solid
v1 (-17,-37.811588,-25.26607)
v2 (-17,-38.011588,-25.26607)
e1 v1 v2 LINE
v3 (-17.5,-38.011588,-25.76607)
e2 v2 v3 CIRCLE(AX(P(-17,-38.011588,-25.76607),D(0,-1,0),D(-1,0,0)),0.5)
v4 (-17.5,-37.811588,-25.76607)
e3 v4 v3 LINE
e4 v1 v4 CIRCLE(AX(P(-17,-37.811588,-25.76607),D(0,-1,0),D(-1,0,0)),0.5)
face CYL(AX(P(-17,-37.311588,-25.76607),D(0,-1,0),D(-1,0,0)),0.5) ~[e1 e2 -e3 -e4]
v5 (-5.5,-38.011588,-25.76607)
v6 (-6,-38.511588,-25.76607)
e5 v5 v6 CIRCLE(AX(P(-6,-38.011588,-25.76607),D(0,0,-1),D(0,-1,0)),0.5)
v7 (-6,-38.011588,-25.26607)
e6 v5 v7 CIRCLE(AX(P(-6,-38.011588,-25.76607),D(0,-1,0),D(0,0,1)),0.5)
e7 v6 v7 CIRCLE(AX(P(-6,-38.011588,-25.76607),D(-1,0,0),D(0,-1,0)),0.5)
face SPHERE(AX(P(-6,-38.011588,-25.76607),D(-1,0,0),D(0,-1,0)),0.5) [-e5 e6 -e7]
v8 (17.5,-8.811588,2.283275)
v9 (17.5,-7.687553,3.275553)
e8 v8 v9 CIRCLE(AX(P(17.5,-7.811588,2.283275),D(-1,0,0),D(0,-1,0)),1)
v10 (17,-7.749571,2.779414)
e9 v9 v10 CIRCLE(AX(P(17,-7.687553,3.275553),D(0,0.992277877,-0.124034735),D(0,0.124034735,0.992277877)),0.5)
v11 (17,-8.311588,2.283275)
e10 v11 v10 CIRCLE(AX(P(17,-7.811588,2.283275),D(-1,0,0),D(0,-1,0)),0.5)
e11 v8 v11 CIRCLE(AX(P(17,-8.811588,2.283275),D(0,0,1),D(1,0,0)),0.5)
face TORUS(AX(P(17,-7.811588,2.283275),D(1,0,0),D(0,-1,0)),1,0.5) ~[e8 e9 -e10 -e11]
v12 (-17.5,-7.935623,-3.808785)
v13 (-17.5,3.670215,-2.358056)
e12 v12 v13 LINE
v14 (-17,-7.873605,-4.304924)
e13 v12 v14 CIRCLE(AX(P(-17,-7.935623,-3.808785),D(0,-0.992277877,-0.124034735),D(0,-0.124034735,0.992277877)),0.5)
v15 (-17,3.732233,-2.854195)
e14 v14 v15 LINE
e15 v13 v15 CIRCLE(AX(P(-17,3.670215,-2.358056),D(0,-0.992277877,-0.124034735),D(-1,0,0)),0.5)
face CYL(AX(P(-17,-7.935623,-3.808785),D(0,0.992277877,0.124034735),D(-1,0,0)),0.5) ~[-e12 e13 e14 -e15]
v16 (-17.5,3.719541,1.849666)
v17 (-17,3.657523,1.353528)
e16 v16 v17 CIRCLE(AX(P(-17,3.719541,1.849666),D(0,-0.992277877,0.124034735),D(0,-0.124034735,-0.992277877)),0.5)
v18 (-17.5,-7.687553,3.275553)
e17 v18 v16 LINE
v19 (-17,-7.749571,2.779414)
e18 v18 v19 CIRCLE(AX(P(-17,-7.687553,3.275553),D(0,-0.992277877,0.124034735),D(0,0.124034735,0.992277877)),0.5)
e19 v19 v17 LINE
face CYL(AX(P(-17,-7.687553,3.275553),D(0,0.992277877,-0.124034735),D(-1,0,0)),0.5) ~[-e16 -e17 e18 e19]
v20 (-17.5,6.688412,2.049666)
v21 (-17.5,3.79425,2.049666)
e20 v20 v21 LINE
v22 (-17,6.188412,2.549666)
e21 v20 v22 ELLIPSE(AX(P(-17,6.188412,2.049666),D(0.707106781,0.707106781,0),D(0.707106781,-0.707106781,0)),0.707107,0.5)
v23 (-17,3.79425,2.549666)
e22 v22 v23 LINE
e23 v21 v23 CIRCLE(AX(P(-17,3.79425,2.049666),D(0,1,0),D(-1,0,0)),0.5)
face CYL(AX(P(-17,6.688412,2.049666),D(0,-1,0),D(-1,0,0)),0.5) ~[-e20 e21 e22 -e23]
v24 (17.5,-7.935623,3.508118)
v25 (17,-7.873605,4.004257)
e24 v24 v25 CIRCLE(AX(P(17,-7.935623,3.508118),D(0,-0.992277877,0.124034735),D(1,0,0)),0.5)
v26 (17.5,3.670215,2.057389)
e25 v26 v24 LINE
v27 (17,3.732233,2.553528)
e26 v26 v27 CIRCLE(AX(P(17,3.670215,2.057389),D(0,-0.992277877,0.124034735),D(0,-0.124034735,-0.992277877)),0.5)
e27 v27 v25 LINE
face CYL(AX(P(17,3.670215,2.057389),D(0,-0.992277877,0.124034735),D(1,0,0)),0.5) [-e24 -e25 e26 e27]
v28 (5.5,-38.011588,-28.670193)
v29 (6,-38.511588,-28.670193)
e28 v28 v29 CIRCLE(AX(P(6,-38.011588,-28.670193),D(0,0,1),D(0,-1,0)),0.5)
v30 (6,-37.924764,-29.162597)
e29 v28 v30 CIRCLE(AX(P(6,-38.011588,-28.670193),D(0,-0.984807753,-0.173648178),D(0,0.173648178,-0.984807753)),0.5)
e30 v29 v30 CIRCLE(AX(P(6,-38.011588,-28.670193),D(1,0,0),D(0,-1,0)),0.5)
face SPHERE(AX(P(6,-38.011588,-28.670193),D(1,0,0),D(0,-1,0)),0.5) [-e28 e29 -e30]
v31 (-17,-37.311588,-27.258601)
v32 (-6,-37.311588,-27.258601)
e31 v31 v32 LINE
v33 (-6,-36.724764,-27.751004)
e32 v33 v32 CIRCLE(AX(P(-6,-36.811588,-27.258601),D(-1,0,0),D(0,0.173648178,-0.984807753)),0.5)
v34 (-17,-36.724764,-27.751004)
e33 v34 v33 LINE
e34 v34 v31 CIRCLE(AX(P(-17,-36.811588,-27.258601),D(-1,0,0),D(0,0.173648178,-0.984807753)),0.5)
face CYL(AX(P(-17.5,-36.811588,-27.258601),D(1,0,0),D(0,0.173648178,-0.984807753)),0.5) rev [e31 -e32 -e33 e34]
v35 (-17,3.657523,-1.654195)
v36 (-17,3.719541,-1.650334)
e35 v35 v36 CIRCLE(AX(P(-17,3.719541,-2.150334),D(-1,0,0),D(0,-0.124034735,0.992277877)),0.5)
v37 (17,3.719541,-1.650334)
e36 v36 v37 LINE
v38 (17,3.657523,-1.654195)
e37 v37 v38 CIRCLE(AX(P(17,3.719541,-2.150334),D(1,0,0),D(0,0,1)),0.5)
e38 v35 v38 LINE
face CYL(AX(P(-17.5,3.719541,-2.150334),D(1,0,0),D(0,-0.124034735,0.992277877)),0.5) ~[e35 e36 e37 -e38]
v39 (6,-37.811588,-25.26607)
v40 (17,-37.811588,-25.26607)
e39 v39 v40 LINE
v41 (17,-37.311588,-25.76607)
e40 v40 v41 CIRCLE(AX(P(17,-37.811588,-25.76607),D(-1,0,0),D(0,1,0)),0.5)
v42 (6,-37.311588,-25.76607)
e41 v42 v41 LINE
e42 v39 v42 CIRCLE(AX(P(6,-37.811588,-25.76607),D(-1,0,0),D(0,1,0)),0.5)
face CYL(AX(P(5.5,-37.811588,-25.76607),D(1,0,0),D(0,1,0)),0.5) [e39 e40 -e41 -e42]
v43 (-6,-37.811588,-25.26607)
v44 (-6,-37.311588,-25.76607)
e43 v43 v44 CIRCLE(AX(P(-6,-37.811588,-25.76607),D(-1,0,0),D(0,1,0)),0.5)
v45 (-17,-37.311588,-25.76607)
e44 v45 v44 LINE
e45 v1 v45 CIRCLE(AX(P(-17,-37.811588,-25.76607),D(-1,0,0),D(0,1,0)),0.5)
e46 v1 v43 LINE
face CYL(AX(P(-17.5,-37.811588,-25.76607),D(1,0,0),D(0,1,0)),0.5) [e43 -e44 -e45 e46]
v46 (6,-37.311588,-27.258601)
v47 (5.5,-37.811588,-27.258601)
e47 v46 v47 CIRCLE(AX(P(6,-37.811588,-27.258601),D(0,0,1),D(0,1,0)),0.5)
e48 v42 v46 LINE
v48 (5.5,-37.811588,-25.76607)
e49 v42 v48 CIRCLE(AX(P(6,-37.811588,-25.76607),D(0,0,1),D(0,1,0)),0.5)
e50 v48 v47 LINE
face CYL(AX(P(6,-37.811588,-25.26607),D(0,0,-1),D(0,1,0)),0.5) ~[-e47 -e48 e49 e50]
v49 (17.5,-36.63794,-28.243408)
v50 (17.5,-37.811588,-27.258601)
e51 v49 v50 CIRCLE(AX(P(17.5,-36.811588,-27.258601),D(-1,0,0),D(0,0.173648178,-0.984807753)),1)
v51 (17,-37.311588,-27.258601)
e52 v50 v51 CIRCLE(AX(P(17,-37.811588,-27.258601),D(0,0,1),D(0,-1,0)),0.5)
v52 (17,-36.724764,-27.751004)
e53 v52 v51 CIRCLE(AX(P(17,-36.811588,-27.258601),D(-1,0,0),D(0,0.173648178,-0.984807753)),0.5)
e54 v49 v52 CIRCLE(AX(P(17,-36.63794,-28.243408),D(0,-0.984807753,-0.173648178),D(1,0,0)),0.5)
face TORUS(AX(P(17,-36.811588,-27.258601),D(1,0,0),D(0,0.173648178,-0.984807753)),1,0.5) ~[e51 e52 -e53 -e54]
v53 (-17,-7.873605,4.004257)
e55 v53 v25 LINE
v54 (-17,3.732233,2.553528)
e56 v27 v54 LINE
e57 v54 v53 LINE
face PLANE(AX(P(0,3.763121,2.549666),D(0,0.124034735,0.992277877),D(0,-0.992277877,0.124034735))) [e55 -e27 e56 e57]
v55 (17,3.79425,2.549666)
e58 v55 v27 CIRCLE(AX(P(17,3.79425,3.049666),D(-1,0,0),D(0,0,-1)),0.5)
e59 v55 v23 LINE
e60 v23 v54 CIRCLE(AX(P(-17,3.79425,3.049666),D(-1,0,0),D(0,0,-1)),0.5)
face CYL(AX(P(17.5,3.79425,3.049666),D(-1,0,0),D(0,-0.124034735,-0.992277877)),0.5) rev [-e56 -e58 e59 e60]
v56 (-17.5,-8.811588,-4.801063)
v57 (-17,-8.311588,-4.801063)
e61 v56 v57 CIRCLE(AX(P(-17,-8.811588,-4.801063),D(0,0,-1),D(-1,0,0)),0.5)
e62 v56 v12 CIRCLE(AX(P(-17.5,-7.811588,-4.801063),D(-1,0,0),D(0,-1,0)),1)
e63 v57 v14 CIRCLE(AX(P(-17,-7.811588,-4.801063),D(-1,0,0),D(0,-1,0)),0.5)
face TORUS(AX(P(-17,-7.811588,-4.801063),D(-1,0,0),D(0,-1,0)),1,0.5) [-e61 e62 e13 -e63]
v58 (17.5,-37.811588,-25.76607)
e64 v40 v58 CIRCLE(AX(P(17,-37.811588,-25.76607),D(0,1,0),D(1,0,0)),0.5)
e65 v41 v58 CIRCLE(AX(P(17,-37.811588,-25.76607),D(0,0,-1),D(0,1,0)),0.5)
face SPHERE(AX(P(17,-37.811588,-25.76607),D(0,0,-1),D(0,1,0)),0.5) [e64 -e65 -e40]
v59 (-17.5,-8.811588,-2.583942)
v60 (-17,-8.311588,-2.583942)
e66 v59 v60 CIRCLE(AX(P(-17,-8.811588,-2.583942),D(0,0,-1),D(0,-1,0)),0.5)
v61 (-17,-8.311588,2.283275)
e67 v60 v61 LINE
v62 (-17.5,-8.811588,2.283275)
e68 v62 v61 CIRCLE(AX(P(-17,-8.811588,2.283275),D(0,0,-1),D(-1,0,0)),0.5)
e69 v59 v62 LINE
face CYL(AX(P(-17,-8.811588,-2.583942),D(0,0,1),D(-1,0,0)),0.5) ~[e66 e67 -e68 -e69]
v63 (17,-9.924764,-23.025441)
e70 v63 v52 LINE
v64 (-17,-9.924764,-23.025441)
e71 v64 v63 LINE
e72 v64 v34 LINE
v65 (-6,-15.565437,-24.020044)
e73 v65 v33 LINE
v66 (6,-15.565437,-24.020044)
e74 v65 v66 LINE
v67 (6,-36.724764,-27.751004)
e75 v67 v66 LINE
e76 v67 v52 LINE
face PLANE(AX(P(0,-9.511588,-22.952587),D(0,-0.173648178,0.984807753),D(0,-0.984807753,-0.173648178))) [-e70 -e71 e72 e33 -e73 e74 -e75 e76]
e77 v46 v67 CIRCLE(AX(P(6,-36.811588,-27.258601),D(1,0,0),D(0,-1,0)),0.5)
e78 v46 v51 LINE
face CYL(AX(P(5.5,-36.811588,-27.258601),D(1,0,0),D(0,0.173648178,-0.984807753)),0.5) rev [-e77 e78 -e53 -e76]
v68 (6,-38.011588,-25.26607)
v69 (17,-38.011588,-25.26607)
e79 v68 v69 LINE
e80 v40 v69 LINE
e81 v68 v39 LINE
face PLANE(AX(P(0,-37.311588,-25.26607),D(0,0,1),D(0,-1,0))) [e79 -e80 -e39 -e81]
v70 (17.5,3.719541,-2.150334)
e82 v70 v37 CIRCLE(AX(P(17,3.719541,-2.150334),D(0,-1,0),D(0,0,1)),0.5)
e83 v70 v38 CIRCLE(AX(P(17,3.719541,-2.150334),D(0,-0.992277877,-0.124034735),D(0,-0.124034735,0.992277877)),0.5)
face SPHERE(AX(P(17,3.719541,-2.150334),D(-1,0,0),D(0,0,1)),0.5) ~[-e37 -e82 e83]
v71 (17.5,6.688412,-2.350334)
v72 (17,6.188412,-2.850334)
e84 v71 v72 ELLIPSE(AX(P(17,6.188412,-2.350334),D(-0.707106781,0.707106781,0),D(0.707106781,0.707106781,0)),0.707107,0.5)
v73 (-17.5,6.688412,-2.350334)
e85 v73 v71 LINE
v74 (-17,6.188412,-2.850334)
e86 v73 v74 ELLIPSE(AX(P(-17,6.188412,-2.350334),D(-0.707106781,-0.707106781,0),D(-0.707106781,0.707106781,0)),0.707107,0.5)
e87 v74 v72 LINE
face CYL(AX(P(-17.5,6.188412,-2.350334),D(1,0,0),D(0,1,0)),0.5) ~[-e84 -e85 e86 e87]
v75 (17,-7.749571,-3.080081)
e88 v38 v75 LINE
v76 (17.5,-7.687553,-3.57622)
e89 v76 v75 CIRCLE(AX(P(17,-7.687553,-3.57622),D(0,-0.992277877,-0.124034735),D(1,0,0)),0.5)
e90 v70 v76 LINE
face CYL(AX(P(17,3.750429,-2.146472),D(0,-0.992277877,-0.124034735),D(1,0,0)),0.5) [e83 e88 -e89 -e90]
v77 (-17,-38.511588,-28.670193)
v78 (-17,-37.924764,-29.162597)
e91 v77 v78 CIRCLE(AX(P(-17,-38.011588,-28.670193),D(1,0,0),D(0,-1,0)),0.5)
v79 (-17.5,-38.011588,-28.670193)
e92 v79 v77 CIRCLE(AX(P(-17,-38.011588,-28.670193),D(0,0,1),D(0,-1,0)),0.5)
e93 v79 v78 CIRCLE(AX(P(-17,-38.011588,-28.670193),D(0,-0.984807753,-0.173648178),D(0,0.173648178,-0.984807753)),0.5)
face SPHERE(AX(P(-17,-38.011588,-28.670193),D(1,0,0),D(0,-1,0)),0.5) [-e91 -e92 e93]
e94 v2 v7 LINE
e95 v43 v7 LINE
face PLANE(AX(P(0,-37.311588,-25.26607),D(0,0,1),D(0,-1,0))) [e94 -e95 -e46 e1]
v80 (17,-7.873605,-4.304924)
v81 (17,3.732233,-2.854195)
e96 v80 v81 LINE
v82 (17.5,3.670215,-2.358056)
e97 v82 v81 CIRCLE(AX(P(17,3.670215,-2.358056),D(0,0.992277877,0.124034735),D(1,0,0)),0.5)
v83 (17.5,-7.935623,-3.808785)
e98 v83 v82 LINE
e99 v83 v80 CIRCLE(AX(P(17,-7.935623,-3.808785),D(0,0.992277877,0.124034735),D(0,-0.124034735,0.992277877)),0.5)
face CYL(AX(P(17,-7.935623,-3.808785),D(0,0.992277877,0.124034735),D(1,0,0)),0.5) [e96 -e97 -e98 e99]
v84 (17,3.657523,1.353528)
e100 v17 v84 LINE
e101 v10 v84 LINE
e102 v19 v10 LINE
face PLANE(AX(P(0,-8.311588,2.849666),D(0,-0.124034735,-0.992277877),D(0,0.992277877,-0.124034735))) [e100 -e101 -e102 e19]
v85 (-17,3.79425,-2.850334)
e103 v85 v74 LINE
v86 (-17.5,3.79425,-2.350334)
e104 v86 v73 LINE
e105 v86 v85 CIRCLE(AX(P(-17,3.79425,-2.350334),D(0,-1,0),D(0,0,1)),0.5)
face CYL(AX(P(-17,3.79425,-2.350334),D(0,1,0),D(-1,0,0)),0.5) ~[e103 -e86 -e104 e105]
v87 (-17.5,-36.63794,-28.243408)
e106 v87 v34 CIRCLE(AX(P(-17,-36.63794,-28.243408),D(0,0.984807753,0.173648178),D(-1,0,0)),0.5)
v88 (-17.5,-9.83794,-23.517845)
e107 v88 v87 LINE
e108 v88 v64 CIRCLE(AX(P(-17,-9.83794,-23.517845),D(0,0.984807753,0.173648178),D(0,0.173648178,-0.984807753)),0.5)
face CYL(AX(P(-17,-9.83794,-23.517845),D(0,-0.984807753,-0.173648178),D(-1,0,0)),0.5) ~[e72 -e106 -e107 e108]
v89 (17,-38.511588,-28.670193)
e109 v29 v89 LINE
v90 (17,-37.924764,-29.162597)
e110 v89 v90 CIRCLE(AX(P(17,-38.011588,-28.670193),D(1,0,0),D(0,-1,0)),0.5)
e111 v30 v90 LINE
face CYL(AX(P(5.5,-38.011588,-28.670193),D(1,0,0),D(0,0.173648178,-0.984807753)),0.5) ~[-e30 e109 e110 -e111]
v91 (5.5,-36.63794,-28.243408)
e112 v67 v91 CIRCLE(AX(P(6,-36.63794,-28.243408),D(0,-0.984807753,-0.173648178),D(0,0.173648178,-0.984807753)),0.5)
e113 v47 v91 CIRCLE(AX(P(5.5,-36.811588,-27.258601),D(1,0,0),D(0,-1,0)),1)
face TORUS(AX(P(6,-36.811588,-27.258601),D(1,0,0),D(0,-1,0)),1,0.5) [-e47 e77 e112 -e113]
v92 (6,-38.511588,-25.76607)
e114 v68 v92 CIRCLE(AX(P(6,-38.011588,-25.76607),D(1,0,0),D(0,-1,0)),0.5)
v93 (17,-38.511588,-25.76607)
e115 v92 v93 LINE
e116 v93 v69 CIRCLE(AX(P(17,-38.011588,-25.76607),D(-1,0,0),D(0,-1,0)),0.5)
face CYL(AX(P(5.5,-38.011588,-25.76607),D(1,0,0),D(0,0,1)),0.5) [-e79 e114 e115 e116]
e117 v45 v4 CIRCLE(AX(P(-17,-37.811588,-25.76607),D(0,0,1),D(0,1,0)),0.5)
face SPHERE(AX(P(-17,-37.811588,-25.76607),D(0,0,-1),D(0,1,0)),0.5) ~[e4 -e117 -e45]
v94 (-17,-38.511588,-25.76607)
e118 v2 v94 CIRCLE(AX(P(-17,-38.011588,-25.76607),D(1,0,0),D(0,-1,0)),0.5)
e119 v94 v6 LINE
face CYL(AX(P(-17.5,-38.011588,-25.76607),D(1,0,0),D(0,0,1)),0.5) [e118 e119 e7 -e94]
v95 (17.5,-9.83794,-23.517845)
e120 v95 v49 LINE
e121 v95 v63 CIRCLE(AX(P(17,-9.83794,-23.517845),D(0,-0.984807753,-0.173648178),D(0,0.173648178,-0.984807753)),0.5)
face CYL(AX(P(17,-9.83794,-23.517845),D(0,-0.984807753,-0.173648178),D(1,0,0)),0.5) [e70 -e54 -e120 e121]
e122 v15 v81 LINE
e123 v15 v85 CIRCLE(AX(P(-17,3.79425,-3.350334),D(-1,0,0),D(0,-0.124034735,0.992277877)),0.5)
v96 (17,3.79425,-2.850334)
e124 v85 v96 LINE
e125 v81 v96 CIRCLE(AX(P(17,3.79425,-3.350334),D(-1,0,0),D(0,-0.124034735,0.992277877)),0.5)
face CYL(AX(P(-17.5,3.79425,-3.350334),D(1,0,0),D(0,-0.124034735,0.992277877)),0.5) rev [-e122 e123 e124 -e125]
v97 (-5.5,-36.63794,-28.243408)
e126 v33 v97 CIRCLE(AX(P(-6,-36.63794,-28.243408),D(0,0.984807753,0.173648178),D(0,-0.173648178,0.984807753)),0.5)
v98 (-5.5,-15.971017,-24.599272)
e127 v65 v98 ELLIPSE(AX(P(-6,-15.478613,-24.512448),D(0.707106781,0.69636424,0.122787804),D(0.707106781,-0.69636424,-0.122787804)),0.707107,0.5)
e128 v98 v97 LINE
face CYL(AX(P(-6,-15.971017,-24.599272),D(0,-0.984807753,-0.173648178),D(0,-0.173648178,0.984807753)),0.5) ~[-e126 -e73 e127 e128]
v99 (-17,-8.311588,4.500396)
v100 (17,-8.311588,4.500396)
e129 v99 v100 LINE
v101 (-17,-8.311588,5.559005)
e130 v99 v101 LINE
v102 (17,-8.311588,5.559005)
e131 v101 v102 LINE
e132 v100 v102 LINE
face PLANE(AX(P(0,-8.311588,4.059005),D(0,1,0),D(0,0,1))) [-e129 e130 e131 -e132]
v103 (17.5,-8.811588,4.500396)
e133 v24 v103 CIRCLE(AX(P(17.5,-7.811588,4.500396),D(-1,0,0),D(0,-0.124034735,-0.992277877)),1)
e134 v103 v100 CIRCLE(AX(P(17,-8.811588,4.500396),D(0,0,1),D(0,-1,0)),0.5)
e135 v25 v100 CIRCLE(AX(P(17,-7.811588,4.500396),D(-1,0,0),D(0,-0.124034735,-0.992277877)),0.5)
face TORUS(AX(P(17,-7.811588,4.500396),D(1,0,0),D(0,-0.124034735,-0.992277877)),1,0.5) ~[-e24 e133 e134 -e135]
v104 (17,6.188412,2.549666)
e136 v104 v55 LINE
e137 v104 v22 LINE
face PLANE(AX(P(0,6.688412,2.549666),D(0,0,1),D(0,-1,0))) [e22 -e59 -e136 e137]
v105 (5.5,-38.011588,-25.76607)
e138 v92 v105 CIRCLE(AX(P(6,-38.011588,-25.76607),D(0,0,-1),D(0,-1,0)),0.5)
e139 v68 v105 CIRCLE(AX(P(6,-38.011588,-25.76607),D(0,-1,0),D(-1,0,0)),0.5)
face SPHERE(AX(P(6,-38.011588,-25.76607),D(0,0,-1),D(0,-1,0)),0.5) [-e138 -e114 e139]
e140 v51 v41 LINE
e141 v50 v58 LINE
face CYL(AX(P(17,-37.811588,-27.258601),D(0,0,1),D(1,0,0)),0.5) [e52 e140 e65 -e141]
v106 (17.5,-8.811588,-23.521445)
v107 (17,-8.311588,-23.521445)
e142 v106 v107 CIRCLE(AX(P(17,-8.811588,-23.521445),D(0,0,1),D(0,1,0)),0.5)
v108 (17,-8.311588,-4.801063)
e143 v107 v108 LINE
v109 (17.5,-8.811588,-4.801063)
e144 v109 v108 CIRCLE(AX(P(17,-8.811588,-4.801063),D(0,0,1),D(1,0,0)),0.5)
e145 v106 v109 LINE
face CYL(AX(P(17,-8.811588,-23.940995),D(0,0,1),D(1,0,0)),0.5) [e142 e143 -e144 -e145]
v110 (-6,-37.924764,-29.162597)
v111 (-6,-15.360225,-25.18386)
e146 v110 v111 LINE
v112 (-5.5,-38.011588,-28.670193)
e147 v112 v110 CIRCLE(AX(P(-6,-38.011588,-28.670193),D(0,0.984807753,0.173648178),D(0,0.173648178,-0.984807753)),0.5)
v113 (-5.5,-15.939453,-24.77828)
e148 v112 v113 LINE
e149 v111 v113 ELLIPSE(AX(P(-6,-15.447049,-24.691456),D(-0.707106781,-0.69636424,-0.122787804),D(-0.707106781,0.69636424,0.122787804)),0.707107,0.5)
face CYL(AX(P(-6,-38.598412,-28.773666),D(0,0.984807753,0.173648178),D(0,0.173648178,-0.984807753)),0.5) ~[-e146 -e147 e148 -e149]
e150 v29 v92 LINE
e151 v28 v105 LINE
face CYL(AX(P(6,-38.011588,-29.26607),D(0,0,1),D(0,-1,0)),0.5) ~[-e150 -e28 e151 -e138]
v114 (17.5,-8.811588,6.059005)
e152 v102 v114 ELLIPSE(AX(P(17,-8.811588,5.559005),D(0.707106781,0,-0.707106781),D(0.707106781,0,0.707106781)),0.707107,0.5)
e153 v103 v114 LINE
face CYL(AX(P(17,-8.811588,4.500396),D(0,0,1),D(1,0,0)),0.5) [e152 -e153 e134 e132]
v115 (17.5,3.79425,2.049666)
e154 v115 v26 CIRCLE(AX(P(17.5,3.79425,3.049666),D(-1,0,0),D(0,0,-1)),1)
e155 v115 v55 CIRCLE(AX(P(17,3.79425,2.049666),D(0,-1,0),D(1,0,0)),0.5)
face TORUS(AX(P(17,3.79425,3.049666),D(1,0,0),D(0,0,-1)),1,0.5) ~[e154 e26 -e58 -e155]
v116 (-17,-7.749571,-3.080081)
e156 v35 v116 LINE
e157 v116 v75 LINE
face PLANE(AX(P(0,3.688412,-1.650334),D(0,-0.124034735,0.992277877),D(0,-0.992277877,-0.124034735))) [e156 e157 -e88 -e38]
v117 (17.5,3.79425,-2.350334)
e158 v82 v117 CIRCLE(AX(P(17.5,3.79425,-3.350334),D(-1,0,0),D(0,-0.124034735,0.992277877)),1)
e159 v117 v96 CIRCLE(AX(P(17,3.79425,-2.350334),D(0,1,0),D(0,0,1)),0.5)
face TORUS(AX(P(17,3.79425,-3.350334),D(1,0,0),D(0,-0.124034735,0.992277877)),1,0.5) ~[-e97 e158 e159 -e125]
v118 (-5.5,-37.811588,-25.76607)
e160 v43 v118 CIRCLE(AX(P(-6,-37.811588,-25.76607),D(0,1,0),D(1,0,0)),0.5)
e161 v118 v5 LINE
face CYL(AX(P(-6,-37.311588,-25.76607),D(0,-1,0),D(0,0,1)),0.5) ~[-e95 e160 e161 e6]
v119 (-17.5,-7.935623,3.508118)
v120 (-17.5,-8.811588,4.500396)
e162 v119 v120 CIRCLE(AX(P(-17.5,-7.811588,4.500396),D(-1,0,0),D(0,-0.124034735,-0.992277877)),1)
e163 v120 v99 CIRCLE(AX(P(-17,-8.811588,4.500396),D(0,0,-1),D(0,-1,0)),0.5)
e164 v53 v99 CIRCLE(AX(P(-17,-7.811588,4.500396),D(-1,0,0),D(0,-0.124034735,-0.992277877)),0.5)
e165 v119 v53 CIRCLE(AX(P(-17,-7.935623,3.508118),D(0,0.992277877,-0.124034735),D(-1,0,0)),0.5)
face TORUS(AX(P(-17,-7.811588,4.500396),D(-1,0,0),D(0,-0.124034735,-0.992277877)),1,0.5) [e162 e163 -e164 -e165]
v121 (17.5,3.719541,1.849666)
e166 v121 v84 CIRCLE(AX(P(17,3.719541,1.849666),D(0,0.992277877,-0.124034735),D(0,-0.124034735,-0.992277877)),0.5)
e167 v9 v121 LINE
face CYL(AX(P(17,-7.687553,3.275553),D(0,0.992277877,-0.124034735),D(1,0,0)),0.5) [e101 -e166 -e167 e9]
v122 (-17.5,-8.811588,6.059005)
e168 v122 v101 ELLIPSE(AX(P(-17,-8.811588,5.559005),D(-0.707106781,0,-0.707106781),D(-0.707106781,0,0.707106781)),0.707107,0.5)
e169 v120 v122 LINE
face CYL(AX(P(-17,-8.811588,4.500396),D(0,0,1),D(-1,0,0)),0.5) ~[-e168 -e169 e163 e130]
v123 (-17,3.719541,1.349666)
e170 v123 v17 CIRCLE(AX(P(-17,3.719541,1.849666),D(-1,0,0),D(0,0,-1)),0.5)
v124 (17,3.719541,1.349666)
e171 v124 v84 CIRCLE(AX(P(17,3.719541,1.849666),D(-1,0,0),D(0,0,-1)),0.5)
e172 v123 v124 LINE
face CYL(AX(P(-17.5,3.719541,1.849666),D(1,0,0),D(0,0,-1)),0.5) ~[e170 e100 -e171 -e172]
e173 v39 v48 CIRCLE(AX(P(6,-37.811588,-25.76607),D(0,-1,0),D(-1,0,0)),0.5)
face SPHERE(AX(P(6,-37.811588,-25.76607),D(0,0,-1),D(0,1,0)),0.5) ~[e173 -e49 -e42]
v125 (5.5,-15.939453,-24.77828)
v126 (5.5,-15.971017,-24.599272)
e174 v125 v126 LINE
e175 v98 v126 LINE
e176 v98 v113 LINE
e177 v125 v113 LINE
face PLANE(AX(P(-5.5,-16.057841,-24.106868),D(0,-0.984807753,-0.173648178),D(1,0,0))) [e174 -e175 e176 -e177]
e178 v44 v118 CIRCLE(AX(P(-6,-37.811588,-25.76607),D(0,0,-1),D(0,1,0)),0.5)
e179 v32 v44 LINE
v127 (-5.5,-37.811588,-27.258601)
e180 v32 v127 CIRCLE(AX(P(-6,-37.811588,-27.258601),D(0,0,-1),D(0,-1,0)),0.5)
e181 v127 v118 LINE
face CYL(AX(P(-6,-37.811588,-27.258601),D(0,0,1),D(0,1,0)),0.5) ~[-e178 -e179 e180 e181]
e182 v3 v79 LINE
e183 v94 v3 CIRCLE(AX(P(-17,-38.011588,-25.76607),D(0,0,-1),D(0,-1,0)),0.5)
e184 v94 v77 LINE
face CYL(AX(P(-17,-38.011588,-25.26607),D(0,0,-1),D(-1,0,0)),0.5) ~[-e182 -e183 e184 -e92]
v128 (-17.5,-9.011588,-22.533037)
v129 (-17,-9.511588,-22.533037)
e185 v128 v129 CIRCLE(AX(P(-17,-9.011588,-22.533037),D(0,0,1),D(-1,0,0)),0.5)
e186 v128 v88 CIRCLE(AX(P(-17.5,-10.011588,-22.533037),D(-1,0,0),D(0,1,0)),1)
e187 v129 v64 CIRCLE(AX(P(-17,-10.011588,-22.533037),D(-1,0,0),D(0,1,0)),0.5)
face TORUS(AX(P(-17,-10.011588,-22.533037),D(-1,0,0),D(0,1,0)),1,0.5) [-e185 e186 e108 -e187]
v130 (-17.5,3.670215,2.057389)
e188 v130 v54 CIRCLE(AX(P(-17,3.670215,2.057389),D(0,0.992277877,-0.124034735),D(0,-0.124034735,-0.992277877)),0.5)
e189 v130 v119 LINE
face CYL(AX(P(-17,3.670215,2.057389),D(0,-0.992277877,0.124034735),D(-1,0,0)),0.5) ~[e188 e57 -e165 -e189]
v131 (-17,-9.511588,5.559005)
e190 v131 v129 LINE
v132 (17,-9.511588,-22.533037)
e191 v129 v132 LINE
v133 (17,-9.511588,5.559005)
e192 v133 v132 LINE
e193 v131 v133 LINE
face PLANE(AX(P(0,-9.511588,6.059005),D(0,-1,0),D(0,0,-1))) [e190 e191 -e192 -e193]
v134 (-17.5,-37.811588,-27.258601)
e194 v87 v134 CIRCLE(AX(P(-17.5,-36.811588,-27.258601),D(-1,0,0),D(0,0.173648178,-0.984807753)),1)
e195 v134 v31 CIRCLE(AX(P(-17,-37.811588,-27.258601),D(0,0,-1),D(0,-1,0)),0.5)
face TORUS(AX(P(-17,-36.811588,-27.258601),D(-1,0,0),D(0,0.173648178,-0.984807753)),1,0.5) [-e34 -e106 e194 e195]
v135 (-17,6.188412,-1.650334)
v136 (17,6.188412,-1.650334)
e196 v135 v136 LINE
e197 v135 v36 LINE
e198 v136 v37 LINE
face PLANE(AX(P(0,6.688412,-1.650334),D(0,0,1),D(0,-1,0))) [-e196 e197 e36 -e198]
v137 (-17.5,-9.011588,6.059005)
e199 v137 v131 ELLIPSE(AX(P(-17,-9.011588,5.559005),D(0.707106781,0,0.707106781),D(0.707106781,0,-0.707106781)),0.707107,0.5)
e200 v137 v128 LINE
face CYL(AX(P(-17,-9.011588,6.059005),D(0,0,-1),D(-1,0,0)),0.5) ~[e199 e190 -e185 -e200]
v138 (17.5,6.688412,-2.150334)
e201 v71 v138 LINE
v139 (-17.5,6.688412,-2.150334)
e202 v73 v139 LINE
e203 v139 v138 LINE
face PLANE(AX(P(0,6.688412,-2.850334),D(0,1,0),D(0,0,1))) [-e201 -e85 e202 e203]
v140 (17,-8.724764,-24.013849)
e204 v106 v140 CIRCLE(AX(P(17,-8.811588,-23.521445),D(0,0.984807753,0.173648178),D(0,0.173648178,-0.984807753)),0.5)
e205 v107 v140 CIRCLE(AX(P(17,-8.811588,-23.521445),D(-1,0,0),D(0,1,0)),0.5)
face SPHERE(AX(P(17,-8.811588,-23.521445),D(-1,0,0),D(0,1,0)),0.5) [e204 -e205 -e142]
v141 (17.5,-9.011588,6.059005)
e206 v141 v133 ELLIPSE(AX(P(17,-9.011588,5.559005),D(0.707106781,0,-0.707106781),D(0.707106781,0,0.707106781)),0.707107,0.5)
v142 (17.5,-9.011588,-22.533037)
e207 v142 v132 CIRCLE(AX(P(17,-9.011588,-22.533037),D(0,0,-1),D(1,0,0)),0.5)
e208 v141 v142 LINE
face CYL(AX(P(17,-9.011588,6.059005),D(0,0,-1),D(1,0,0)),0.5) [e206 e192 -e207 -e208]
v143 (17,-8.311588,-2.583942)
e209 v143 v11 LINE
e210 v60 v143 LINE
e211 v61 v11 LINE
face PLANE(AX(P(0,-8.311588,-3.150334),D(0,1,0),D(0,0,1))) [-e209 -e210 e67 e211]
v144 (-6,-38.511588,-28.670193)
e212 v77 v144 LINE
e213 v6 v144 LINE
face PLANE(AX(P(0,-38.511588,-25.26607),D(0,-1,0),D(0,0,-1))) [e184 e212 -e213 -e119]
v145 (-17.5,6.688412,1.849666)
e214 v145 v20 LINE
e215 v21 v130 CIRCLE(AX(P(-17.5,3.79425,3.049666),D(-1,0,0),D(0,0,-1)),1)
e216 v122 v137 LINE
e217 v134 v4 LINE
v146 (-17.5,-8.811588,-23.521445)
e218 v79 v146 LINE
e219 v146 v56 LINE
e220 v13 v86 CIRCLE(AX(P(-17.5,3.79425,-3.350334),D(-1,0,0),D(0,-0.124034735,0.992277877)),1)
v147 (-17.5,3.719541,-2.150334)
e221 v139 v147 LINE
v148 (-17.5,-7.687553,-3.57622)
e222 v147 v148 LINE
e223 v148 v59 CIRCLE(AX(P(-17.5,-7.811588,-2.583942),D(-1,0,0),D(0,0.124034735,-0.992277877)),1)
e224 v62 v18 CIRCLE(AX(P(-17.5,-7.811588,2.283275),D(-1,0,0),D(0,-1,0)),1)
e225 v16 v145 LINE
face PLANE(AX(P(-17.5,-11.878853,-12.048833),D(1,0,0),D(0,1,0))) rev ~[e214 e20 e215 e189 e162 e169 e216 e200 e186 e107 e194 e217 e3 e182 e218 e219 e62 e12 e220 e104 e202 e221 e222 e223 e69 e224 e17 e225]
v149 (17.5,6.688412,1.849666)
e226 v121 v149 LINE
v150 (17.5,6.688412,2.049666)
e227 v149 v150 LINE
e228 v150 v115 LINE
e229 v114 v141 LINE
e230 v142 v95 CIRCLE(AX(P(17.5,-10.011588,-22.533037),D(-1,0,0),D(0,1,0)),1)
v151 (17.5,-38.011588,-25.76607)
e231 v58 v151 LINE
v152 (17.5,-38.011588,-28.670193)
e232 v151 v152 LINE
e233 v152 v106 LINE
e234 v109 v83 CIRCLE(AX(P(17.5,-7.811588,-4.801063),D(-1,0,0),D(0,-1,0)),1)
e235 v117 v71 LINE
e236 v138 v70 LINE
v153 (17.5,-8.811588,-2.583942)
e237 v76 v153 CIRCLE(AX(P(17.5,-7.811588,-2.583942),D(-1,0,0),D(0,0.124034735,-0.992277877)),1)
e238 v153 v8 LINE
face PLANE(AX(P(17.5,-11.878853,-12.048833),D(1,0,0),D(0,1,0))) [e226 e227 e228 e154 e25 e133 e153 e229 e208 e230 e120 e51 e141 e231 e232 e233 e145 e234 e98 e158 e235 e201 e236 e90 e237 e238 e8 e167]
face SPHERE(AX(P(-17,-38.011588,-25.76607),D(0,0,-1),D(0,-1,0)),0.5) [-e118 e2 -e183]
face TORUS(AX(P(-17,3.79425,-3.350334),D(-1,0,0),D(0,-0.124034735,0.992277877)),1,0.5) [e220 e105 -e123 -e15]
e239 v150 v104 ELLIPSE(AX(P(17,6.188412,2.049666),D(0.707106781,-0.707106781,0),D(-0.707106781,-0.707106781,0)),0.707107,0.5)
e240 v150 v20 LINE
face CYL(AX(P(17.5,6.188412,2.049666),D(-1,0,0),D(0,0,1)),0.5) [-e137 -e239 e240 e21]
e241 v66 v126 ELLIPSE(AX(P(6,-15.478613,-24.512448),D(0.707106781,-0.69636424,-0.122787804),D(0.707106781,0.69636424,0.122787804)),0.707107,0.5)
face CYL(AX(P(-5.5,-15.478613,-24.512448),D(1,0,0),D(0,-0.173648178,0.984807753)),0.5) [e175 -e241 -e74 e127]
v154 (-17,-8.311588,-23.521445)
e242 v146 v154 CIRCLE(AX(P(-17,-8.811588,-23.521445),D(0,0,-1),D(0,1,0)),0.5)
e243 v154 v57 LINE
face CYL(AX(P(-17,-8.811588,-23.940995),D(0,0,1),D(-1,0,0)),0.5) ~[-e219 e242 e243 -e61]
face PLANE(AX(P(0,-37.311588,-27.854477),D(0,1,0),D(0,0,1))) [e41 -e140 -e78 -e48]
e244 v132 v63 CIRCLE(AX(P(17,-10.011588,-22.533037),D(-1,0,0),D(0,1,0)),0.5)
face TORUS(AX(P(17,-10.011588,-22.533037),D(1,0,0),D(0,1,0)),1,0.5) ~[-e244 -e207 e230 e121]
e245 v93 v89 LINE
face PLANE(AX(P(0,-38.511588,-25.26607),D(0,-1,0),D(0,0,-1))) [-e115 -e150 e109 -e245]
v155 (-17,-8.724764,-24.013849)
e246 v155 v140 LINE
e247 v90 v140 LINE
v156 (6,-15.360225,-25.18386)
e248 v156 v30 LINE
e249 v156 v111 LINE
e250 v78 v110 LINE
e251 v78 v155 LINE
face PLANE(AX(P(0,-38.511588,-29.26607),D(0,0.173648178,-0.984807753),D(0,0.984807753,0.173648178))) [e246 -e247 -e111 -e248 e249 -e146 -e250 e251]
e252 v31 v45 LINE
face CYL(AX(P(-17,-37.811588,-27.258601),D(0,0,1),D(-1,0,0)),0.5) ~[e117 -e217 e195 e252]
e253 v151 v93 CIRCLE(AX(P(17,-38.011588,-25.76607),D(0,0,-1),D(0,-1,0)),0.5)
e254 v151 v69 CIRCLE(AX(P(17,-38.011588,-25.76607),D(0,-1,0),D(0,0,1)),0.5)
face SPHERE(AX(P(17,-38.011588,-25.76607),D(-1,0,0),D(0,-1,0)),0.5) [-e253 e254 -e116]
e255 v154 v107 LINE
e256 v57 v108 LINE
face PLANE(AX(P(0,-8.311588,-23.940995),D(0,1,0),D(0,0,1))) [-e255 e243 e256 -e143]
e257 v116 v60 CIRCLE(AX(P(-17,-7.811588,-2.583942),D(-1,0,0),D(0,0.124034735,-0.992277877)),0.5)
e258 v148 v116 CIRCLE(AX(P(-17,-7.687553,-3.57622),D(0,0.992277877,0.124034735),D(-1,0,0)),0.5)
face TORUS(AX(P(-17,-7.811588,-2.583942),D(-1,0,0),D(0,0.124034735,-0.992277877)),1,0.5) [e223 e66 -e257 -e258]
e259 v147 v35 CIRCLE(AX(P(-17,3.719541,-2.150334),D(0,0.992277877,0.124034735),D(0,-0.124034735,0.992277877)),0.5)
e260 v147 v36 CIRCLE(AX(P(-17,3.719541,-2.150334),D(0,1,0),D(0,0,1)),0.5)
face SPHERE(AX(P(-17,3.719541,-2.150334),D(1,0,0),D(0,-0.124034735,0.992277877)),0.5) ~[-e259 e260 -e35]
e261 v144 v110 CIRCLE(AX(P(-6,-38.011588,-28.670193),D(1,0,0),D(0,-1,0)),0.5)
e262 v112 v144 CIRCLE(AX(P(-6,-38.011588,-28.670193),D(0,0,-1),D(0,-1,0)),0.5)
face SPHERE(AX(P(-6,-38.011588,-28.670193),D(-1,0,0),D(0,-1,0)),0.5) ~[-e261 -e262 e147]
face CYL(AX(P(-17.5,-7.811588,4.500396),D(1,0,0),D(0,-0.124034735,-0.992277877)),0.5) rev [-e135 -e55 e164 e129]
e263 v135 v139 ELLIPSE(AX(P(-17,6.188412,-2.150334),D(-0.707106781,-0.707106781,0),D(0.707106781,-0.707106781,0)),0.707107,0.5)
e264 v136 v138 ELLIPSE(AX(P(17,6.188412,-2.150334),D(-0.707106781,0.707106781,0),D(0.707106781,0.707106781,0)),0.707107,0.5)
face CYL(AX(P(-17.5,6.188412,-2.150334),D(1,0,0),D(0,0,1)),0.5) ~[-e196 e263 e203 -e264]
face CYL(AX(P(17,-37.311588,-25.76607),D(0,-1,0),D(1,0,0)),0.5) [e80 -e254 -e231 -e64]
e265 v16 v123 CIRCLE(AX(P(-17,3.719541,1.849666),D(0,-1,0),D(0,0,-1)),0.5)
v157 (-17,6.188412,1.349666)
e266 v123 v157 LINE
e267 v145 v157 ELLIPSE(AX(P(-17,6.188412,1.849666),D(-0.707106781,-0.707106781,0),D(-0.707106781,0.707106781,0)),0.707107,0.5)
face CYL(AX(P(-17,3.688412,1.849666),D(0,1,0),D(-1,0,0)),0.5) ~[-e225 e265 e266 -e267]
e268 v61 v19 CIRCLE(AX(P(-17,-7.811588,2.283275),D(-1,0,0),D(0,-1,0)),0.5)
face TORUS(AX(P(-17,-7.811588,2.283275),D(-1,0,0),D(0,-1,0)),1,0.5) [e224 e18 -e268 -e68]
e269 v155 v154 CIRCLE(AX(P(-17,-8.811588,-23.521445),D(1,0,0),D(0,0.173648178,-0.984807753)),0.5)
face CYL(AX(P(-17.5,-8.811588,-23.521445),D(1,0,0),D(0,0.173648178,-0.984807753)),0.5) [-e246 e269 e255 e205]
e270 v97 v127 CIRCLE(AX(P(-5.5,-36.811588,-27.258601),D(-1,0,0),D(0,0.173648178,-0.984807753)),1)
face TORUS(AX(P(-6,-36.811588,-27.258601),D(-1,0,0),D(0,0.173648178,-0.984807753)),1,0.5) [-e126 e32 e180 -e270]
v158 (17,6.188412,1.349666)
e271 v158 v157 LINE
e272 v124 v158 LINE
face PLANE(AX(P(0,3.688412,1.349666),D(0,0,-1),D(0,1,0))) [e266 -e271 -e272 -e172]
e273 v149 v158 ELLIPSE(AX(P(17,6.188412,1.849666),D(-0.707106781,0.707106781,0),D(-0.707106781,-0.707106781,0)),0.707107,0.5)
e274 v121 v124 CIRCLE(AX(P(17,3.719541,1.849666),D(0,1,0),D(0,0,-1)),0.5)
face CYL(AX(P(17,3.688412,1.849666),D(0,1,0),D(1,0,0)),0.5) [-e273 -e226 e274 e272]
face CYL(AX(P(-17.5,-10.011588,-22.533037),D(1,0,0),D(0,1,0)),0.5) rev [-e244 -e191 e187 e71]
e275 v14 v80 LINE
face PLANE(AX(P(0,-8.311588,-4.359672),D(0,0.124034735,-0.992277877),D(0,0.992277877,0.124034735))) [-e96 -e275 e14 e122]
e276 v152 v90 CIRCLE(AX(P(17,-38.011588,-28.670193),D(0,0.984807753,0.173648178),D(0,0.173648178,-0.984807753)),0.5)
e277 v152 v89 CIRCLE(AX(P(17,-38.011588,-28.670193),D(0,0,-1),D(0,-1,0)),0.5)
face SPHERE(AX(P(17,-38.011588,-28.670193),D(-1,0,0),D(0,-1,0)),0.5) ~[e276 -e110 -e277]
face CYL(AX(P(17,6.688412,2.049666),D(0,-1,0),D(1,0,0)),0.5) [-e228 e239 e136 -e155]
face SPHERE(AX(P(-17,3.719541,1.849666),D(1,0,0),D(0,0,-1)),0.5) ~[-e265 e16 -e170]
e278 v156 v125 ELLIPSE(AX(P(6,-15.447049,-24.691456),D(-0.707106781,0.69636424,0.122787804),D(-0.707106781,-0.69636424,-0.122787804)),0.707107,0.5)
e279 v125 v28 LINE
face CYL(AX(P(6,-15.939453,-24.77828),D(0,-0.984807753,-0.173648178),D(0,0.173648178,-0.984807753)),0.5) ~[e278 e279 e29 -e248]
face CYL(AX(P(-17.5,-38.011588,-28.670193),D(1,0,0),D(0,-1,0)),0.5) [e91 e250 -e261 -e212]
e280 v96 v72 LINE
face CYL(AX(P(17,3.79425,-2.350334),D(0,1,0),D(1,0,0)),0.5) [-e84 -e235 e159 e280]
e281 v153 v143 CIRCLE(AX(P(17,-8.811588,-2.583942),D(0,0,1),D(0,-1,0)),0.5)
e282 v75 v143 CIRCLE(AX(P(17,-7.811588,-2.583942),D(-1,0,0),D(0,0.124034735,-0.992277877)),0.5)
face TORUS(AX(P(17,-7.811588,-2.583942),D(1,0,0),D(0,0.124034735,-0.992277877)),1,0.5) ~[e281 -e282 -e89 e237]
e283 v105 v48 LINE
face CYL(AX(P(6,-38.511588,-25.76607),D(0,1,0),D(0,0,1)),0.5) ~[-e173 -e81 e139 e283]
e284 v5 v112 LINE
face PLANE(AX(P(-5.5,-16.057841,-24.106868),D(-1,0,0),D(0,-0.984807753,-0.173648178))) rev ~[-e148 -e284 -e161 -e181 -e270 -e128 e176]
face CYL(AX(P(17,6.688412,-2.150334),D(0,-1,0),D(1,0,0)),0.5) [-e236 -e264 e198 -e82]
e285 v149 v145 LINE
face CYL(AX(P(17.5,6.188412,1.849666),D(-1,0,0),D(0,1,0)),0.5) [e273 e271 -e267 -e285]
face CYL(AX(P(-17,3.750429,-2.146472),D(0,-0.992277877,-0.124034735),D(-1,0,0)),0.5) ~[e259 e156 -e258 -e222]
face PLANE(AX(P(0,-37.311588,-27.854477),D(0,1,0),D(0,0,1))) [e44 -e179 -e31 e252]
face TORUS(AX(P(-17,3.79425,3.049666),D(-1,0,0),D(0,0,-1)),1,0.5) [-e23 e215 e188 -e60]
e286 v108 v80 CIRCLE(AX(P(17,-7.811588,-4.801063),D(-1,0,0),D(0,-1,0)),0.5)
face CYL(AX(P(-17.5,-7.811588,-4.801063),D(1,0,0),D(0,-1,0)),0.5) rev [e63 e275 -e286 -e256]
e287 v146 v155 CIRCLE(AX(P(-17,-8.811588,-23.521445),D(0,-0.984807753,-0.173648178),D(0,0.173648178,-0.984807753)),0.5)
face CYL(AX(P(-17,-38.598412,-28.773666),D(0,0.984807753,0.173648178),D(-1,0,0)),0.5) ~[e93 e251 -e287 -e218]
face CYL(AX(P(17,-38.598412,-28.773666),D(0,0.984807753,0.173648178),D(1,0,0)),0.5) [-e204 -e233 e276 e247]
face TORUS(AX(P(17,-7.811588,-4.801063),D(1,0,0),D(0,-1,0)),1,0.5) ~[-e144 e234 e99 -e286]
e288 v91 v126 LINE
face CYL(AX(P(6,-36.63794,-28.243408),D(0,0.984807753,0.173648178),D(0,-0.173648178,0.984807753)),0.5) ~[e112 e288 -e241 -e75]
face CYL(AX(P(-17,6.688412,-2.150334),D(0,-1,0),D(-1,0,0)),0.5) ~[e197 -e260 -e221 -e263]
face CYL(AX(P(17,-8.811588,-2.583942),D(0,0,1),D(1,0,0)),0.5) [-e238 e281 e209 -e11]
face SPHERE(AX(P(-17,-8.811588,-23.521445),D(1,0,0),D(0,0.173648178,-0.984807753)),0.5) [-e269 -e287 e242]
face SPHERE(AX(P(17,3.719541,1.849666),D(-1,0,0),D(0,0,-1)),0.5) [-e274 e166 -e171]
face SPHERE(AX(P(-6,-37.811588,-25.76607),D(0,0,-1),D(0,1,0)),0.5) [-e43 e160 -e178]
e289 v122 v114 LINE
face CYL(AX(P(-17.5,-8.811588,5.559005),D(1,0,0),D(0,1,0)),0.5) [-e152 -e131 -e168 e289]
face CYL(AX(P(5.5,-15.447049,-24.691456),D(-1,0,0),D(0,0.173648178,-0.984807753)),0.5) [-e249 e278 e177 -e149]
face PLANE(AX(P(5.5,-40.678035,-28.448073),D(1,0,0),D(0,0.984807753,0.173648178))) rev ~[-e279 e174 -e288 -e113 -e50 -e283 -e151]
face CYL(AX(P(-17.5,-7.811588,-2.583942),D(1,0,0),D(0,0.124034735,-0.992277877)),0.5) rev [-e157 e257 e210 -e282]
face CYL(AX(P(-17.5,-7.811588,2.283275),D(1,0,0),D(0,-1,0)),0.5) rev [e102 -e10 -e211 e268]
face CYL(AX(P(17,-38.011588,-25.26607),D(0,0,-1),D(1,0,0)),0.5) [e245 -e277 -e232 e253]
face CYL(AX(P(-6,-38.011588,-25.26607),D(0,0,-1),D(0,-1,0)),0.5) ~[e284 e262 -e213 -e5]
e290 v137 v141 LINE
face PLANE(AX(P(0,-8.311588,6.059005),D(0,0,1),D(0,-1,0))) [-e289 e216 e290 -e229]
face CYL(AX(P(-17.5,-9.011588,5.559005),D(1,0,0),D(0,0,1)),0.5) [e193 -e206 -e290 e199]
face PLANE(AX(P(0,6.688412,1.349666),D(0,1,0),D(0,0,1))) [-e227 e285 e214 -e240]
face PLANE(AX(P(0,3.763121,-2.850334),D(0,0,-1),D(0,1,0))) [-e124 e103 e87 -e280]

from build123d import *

# Parameters (mm, degrees)
F1_DEPTH = 17.5
F2_W     = 11
F2_H     = 3.4183796076
F2_H_2   = 21.5816203924
F3_DEPTH = 12.5
F4_F1_R  = 0.5
F4_F2_R  = 0.5


with BuildPart() as f1:
    # F0 (on Right) → F1 (new body, symmetric)
    with BuildSketch(Plane.YZ):
        Polygon((3.763121268, 2.5496664763), (-8.3115880299, 4.0590051386), (-8.3115880299, 6.0590051386), (-9.5115880299, 6.0590051386), (-9.5115880299, -22.9525872383), (-37.3115880299, -27.854477302), (-37.3115880299, -25.2660696788), (-38.5115880299, -25.2660696788), (-38.5115880299, -28.0660696788), (-38.5115880299, -29.2660696788), (-8.3115880299, -23.9409948614), (-8.3115880299, -4.3596721859), (3.763121268, -2.8503335237), (6.6884119701, -2.8503335237), (6.6884119701, -1.6503335237), (3.6884119701, -1.6503335237), (-8.3115880299, -3.1503335237), (-8.3115880299, 2.8496664763), (3.6884119701, 1.3496664763), (6.6884119701, 1.3496664763), (6.6884119701, 2.5496664763), align=None)
    extrude(amount=F1_DEPTH, both=True)

    # F2 (on face) → F3 (cut, symmetric)
    with BuildSketch(Plane(origin=(0, 3.6383141153, -20.6339046964), x_dir=(1, 0, 0), z_dir=(0, -0.1736481777, 0.984807753))):
        with Locations((0, -43.2908101962)):
            Rectangle(F2_W, F2_H)
        with Locations((0, -30.7908101962)):
            Rectangle(F2_W, F2_H_2)
    extrude(amount=F3_DEPTH, both=True, mode=Mode.SUBTRACT)

    # F4: fillet of radius 0.5 on 60 edges, made by hand

    # F4_f1
    f4_f1_edges = [f1.edges().sort_by_distance(p)[0] for p in [
        (0, -9.5115880299, -22.9525872383),
        (11.5, -37.3115880299, -27.854477302),
        (-11.5, -37.3115880299, -27.854477302),
        (0, -8.3115880299, -4.3596721859),
        (0, -8.3115880299, 4.0590051386),
        (0, 3.763121268, 2.5496664763),
        (0, 3.763121268, -2.8503335237),
        (0, -8.3115880299, 2.8496664763),
        (0, -8.3115880299, -3.1503335237),
    ]]
    fillet(f4_f1_edges, radius=F4_F1_R)

    # F4_f2
    f4_f2_edges = [f1.edges().sort_by_distance(p)[0] for p in [
        (0, -9.5115880299, 6.0590051386),
        (-17.5, -9.5115880299, -8.237016142),
        (17.5, -9.5115880299, -8.237016142),
        (17.5, -23.3247639411, -25.3882228407),
        (5.5, -26.391302443, -25.9289363159),
        (0, -16.0578409449, -24.1068682497),
        (-5.5, -26.391302443, -25.9289363159),
        (-17.5, -23.3247639411, -25.3882228407),
        (-11.5, -38.5115880299, -29.2660696788),
        (-17.5, -38.5115880299, -27.2660696788),
        (-11.5, -38.5115880299, -25.2660696788),
        (-5.5, -38.5115880299, -27.2660696788),
        (11.5, -38.5115880299, -29.2660696788),
        (5.5, -38.5115880299, -27.2660696788),
        (11.5, -38.5115880299, -25.2660696788),
        (17.5, -38.5115880299, -27.2660696788),
        (-11.5, -37.3115880299, -25.2660696788),
        (-5.5, -37.9115880299, -25.2660696788),
        (-17.5, -37.9115880299, -25.2660696788),
        (11.5, -37.3115880299, -25.2660696788),
        (17.5, -37.9115880299, -25.2660696788),
        (5.5, -37.9115880299, -25.2660696788),
        (-5.5, -27.1821084444, -27.2683767505),
        (0, -15.8526288589, -25.2706838222),
        (5.5, -27.1821084444, -27.2683767505),
        (17.5, -23.4115880299, -26.6035322701),
        (0, -8.3115880299, -23.9409948614),
        (-17.5, -23.4115880299, -26.6035322701),
        (-17.5, -8.3115880299, -14.3710290783),
        (17.5, -8.3115880299, -14.3710290783),
        (-17.5, -8.3115880299, 5.2797006932),
        (0, -8.3115880299, 6.0590051386),
        (17.5, -8.3115880299, 5.2797006932),
        (0, 6.6884119701, 2.5496664763),
        (-17.5, 5.2413310561, 2.5496664763),
        (17.5, 5.2413310561, 2.5496664763),
        (0, 3.6884119701, 1.3496664763),
        (-17.5, 5.1884119701, 1.3496664763),
        (0, 6.6884119701, 1.3496664763),
        (17.5, 5.1884119701, 1.3496664763),
        (-17.5, 5.2413310561, -2.8503335237),
        (0, 6.6884119701, -2.8503335237),
        (17.5, 5.2413310561, -2.8503335237),
        (0, 6.6884119701, -1.6503335237),
        (-17.5, 5.1884119701, -1.6503335237),
        (0, 3.6884119701, -1.6503335237),
        (17.5, 5.1884119701, -1.6503335237),
        (-17.5, -2.0305793463, 2.0645403909),
        (17.5, -2.0305793463, 2.0645403909),
        (-17.5, -2.0305793463, -2.3652074382),
        (17.5, -2.0305793463, -2.3652074382),
        (17.5, -8.1424893115, -2.9587815023),
        (-17.5, -8.1424893115, -2.9587815023),
        (17.5, -8.1424893115, 2.658114455),
        (-17.5, -8.1424893115, 2.658114455),
        (17.5, 3.7631814214, -2.8512997226),
        (-17.5, 3.7631814214, -2.8512997226),
        (17.5, 3.7631814214, 2.5506326753),
        (-17.5, 3.7631814214, 2.5506326753),
        (17.5, -8.1864271178, 4.1694949662),
        (-17.5, -8.1864271178, 4.1694949662),
        (17.5, -8.1864271178, -4.4701620135),
        (-17.5, -8.1864271178, -4.4701620135),
        (-17.5, -9.6285658084, -22.8544312275),
        (-17.5, -37.1329818348, -27.6416227272),
        (-5.5, -37.1329818348, -27.6416227272),
        (5.5, -37.1329818348, -27.6416227272),
        (17.5, -9.6285658084, -22.8544312275),
        (17.5, -37.1329818348, -27.6416227272),
    ]]
    fillet(f4_f2_edges, radius=F4_F2_R)


solid = f1.part
